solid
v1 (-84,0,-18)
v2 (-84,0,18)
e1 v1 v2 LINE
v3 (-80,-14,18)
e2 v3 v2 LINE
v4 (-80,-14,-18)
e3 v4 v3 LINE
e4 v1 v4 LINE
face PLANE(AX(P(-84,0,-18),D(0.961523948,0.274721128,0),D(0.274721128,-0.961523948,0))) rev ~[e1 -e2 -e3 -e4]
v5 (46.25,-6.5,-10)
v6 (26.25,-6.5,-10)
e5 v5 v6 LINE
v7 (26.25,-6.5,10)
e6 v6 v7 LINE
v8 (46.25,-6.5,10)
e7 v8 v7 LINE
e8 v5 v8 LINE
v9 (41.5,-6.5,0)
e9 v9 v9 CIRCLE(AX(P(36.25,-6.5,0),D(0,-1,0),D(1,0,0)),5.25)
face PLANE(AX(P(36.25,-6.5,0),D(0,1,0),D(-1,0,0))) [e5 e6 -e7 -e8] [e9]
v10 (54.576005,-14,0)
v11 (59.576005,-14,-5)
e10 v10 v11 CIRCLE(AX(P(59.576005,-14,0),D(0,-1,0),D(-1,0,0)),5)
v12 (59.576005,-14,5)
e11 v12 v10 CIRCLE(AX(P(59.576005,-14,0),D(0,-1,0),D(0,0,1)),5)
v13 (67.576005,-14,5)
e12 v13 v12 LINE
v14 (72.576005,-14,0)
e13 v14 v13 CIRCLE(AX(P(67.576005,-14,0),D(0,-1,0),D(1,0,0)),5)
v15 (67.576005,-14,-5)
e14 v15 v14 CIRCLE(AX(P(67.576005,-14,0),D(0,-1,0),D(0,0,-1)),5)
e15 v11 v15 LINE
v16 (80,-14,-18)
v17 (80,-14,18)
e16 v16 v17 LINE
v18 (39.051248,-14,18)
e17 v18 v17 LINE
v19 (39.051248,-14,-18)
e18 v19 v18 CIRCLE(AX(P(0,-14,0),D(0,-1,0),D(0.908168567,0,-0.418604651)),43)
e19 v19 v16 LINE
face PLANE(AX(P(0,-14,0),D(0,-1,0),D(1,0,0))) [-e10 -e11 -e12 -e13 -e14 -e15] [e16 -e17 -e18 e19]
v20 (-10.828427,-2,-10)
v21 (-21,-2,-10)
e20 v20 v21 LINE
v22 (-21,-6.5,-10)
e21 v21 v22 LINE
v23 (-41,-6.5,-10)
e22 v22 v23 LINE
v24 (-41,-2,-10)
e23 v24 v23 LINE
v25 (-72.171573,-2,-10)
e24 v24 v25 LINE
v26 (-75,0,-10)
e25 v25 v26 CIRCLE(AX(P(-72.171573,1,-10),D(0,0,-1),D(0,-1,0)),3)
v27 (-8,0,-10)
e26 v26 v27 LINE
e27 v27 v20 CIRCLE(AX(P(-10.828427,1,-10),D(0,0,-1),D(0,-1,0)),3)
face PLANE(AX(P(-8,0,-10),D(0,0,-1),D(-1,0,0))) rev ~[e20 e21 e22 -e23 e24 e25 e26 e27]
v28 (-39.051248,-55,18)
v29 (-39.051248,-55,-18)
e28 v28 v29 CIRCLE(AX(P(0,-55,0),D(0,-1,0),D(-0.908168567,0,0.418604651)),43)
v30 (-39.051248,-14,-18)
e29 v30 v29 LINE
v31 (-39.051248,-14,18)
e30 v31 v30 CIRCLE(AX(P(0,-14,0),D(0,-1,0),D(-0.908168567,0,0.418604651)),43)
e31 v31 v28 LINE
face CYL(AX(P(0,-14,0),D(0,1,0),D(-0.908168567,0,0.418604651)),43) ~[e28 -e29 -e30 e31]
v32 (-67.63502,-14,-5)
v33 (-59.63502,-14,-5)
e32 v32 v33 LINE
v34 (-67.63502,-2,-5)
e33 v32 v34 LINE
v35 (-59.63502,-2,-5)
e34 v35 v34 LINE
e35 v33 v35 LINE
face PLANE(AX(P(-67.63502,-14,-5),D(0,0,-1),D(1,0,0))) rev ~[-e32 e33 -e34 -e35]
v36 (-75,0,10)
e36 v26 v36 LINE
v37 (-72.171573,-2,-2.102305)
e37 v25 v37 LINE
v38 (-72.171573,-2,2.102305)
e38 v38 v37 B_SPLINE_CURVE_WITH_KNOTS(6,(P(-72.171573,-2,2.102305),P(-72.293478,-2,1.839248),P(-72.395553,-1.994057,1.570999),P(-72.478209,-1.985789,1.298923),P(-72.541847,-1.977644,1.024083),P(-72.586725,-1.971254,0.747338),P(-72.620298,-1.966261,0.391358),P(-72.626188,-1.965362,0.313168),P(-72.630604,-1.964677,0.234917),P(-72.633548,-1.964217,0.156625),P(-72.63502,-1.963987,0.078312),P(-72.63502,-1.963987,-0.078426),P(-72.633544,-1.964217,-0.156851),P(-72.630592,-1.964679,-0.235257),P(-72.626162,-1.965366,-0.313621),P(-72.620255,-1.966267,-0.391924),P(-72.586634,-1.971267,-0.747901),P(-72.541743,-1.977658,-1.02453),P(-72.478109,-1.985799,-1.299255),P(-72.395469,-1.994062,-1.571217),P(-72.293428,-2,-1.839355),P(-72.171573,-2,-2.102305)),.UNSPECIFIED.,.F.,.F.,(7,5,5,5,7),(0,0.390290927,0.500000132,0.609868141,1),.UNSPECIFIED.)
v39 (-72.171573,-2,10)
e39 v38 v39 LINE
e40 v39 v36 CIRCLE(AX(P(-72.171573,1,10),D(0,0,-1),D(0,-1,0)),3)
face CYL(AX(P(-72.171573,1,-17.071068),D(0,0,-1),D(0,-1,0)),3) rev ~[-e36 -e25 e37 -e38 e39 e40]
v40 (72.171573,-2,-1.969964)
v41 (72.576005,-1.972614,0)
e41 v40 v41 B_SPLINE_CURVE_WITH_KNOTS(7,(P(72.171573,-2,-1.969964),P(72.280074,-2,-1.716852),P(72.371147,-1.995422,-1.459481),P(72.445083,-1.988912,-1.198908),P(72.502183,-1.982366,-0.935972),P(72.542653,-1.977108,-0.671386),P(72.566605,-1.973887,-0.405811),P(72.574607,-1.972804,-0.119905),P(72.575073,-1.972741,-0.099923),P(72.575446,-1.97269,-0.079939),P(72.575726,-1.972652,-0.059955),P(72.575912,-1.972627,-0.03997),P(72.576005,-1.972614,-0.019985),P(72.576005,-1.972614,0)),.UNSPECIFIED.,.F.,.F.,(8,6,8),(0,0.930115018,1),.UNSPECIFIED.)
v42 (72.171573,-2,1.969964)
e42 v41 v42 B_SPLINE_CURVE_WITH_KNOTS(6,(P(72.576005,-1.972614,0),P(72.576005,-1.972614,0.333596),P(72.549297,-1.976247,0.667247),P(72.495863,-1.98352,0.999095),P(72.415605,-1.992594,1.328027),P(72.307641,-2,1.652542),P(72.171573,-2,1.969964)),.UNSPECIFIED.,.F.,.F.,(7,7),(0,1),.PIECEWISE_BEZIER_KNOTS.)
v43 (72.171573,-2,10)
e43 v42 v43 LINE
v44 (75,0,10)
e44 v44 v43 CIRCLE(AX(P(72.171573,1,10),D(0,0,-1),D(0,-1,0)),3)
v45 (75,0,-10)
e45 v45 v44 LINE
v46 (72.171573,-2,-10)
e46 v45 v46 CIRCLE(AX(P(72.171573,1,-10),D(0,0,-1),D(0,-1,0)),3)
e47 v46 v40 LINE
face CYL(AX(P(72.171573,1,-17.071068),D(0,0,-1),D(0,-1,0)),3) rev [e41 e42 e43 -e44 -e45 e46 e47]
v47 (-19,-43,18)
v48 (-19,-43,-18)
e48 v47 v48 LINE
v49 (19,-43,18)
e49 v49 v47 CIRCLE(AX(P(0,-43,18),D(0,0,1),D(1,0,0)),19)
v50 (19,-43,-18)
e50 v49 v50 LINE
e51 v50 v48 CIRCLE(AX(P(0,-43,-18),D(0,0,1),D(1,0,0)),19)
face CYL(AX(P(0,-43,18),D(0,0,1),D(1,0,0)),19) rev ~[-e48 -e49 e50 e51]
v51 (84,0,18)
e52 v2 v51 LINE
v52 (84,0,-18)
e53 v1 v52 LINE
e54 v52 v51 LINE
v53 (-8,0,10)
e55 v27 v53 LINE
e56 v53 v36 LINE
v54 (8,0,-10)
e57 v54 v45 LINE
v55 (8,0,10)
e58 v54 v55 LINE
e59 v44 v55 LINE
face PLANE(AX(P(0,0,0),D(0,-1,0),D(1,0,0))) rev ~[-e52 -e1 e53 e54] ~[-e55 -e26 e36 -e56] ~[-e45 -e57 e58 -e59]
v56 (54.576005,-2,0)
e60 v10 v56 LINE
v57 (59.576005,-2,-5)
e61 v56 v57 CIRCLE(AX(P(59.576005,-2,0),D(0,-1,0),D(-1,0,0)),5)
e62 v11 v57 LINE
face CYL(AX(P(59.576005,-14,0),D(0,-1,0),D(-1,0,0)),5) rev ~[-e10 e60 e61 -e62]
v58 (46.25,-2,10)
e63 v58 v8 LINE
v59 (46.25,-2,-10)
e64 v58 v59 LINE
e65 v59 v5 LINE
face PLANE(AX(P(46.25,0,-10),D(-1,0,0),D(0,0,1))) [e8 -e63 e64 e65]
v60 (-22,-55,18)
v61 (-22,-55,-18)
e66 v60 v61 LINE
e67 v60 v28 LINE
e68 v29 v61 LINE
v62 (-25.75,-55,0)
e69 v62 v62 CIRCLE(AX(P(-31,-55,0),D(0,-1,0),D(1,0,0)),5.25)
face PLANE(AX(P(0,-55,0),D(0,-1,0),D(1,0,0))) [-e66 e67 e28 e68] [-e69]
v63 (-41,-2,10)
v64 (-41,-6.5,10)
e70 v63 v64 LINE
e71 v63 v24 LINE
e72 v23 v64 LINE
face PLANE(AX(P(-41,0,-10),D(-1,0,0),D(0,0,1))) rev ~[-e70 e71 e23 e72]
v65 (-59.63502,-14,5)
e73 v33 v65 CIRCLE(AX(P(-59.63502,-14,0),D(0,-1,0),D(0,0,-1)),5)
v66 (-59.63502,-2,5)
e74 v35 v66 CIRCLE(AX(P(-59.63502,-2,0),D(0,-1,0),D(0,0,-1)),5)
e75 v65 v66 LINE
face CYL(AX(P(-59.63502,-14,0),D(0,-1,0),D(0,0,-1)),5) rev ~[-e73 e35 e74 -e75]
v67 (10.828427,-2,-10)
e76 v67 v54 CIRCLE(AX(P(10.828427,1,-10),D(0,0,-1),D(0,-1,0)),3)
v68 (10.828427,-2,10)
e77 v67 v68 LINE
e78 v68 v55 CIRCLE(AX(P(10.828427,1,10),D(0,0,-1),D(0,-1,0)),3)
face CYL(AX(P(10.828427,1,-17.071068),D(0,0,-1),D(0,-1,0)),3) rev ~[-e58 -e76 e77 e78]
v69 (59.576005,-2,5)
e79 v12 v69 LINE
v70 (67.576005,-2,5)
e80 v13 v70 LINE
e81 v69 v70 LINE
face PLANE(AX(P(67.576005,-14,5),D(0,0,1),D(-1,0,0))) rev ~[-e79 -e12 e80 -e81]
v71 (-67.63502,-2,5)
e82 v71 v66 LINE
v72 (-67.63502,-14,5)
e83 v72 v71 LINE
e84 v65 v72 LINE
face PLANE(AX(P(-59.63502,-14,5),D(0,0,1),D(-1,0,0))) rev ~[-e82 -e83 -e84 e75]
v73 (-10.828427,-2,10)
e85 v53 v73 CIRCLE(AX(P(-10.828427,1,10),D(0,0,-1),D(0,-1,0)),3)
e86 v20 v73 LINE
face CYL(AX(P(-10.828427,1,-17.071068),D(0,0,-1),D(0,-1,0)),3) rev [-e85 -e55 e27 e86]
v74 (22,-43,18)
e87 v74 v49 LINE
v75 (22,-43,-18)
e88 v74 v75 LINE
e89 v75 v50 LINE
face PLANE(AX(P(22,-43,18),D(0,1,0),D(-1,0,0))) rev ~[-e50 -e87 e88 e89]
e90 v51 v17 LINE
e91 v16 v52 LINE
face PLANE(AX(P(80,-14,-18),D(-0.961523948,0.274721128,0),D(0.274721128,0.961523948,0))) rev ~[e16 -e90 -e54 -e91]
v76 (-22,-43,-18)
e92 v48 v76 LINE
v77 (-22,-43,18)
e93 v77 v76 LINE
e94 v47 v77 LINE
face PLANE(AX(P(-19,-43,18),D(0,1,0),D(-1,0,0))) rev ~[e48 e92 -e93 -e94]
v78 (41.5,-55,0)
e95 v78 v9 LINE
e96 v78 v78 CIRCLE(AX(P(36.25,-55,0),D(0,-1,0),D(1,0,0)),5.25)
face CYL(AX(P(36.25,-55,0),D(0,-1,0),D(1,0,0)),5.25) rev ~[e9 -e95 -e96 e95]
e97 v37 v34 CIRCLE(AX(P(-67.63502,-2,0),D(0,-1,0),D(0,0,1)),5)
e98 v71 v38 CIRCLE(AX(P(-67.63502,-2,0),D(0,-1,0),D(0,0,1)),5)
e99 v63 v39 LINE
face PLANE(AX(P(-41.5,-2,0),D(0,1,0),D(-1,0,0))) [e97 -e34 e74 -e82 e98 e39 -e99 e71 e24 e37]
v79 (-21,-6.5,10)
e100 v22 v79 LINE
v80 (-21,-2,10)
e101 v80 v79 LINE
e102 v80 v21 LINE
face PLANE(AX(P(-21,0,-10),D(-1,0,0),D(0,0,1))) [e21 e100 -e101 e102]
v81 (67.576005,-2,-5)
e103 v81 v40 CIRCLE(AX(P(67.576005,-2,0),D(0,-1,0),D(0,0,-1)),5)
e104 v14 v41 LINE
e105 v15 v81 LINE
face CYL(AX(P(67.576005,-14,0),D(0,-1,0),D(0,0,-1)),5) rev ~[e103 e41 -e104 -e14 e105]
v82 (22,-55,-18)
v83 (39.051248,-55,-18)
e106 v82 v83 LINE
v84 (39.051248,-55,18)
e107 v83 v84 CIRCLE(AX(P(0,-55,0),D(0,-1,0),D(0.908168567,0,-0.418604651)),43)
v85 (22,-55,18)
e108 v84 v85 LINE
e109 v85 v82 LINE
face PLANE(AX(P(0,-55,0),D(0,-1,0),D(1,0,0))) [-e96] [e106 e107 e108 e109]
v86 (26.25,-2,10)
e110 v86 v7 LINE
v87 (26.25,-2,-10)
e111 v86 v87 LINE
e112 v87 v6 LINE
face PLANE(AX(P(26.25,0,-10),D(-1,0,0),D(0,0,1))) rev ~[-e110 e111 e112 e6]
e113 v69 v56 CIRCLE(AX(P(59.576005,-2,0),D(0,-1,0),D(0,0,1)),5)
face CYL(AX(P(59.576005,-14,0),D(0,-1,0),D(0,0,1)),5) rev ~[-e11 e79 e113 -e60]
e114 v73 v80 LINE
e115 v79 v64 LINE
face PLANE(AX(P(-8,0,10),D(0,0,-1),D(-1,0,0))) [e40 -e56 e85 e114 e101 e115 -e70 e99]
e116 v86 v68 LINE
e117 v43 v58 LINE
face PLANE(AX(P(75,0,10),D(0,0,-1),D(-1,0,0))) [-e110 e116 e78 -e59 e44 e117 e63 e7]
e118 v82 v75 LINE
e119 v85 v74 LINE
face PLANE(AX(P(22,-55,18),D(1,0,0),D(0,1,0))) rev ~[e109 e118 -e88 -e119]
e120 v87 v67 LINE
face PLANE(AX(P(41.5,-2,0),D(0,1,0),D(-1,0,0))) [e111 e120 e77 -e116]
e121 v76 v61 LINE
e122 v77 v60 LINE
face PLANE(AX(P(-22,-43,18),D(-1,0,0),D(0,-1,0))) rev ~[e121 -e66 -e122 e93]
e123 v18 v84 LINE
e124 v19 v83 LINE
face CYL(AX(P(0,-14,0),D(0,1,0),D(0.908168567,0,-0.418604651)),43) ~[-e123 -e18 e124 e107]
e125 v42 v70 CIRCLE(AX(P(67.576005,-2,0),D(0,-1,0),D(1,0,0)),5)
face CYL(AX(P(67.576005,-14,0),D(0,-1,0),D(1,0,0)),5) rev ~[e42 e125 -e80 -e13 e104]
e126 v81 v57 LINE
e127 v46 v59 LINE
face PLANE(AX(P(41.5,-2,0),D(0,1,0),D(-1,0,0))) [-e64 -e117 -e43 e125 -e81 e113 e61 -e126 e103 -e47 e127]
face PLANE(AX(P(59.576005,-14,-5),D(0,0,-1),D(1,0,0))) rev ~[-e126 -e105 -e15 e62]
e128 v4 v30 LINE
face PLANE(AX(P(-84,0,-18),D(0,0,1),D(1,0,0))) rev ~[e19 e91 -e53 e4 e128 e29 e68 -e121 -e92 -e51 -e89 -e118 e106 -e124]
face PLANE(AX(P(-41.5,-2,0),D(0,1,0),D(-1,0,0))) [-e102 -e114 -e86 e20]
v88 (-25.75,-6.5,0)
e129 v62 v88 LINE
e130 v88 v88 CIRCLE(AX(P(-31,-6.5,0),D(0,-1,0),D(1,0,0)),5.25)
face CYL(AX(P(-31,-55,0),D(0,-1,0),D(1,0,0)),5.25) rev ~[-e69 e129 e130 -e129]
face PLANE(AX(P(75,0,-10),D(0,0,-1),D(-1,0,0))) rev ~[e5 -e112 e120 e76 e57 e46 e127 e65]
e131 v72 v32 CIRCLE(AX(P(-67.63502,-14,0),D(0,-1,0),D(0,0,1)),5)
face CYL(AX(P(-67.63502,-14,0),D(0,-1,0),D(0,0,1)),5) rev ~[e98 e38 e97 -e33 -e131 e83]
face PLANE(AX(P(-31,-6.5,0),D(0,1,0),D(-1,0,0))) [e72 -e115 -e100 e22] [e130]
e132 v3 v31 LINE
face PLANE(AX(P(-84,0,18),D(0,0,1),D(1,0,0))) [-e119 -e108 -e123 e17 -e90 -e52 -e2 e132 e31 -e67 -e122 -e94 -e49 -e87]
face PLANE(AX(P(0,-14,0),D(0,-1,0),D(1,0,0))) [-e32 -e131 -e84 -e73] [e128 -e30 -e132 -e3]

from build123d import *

# Parameters (mm, degrees)
F0_W         = 168
F0_H         = 36
F1_DEPTH     = 14
F3_DEPTH     = 36.001
F5_DEPTH     = 41
F6_R         = 5.25
F7_DEPTH     = 55.001
F8_W         = 20
F8_H         = 20
F9_DEPTH     = 6.5
F10_W        = 67
F10_H        = 20
F11_DEPTH    = 2
F12_T1_DEPTH = 34.1421356237
F14_DEPTH    = 25
F16_DEPTH    = 36.001


# Not quite as in the source:
# - a fillet or chamfer that OpenCascade refuses, or shapes differently, is made with other operations: its cross-section is extruded or revolved along the edge and cut away or added


with BuildPart() as f1:
    # F0 (on Front) → F1 (new body)
    with BuildSketch(Plane.XZ):
        Rectangle(F0_W, F0_H)
    extrude(amount=F1_DEPTH)

    # F2 (on face) → F3 (cut, through all)
    with BuildSketch(Plane(origin=(0, 0, -18), x_dir=(1, 0, 0), z_dir=(0, 0, -1))):
        Polygon((-84, 14), (-84, 0), (-80, 14), align=None)
        Polygon((80, 14), (84, 0), (84, 14), align=None)
    extrude(amount=-F3_DEPTH, mode=Mode.SUBTRACT)

    # F4 (on face) → F5 (join)
    with BuildSketch(Plane.XZ.offset(14)):
        with BuildLine():
            ThreePointArc((39.0512483795, -18), (43, 0), (39.0512483795, 18))
            Line((39.0512483795, 18), (-39.0512483795, 18))
            ThreePointArc((-39.0512483795, 18), (-43, 0), (-39.0512483795, -18))
            Line((-39.0512483795, -18), (39.0512483795, -18))
        make_face()
    extrude(amount=F5_DEPTH)

    # F6 (on face) → F7 (cut, through all)
    with BuildSketch(Plane.XZ.offset(55)):
        with Locations((36.25, 0)):
            Circle(F6_R)
        with Locations((-31, 0)):
            Circle(F6_R)
    extrude(amount=-F7_DEPTH, mode=Mode.SUBTRACT)

    # F8 (on face) → F9 (cut)
    with BuildSketch(Plane(origin=(0, 0, 0), x_dir=(-1, 0, 0), z_dir=(0, 1, 0))):
        with Locations((-36.25, 0)):
            Rectangle(F8_W, F8_H)
        with Locations((31, 0)):
            Rectangle(F8_W, F8_H)
    extrude(amount=-F9_DEPTH, mode=Mode.SUBTRACT)

    # F10 (on face) → F11 (cut)
    with BuildSketch(Plane(origin=(0, 0, 0), x_dir=(-1, 0, 0), z_dir=(0, 1, 0))):
        with Locations((41.5, 0)):
            Rectangle(F10_W, F10_H)
        with Locations((-41.5, 0)):
            Rectangle(F10_W, F10_H)
    extrude(amount=-F11_DEPTH, mode=Mode.SUBTRACT)

    # F12: fillet of radius 3 on 4 edges, made by hand

    # F12_s2 → F12_t1 (join)
    with BuildSketch(Plane.XY.offset(-17.0710678119)):
        with BuildLine():
            ThreePointArc((72.1715728753, -2), (73.9036236828, -1.4494897428), (75, 0))
            Line((75, 0), (75, -2))
            Line((75, -2), (72.1715728753, -2))
        make_face()
        with BuildLine():
            ThreePointArc((10.8284271247, -2), (9.0963763172, -1.4494897428), (8, 0))
            Line((8, 0), (8, -2))
            Line((8, -2), (10.8284271247, -2))
        make_face()
        with BuildLine():
            ThreePointArc((-72.1715728753, -2), (-73.9036236828, -1.4494897428), (-75, 0))
            Line((-75, 0), (-75, -2))
            Line((-75, -2), (-72.1715728753, -2))
        make_face()
        with BuildLine():
            ThreePointArc((-10.8284271247, -2), (-9.0963763172, -1.4494897428), (-8, 0))
            Line((-8, 0), (-8, -2))
            Line((-8, -2), (-10.8284271247, -2))
        make_face()
    extrude(amount=F12_T1_DEPTH)

    # F13 (on face) → F14 (cut)
    with BuildSketch(Plane.XZ.offset(14)):
        with BuildLine():
            ThreePointArc((-67.6350200021, 5), (-72.6350200021, 0), (-67.6350200021, -5))
            Line((-67.6350200021, -5), (-59.6350200021, -5))
            ThreePointArc((-59.6350200021, -5), (-54.6350200021, 0), (-59.6350200021, 5))
            Line((-59.6350200021, 5), (-67.6350200021, 5))
        make_face()
        with BuildLine():
            ThreePointArc((54.5760053992, 0), (56.0404714933, -3.5355339059), (59.5760053992, -5))
            Line((59.5760053992, -5), (67.5760053992, -5))
            ThreePointArc((67.5760053992, -5), (71.1115393052, -3.5355339059), (72.5760053992, 0))
            ThreePointArc((72.5760053992, 0), (71.1115393052, 3.5355339059), (67.5760053992, 5))
            Line((67.5760053992, 5), (59.5760053992, 5))
            ThreePointArc((59.5760053992, 5), (56.0404714933, 3.5355339059), (54.5760053992, 0))
        make_face()
    extrude(amount=-F14_DEPTH, mode=Mode.SUBTRACT)

    # F15 (on face) → F16 (cut, through all)
    with BuildSketch(Plane.XY.offset(18)):
        with BuildLine():
            Line((22, -43), (19, -43))
            ThreePointArc((19, -43), (0, -24), (-19, -43))
            Line((-19, -43), (-22, -43))
            Line((-22, -43), (-22, -55))
            Line((-22, -55), (0, -55))
            Line((0, -55), (22, -55))
            Line((22, -55), (22, -43))
        make_face()
    extrude(amount=-F16_DEPTH, mode=Mode.SUBTRACT)


solid = f1.part
